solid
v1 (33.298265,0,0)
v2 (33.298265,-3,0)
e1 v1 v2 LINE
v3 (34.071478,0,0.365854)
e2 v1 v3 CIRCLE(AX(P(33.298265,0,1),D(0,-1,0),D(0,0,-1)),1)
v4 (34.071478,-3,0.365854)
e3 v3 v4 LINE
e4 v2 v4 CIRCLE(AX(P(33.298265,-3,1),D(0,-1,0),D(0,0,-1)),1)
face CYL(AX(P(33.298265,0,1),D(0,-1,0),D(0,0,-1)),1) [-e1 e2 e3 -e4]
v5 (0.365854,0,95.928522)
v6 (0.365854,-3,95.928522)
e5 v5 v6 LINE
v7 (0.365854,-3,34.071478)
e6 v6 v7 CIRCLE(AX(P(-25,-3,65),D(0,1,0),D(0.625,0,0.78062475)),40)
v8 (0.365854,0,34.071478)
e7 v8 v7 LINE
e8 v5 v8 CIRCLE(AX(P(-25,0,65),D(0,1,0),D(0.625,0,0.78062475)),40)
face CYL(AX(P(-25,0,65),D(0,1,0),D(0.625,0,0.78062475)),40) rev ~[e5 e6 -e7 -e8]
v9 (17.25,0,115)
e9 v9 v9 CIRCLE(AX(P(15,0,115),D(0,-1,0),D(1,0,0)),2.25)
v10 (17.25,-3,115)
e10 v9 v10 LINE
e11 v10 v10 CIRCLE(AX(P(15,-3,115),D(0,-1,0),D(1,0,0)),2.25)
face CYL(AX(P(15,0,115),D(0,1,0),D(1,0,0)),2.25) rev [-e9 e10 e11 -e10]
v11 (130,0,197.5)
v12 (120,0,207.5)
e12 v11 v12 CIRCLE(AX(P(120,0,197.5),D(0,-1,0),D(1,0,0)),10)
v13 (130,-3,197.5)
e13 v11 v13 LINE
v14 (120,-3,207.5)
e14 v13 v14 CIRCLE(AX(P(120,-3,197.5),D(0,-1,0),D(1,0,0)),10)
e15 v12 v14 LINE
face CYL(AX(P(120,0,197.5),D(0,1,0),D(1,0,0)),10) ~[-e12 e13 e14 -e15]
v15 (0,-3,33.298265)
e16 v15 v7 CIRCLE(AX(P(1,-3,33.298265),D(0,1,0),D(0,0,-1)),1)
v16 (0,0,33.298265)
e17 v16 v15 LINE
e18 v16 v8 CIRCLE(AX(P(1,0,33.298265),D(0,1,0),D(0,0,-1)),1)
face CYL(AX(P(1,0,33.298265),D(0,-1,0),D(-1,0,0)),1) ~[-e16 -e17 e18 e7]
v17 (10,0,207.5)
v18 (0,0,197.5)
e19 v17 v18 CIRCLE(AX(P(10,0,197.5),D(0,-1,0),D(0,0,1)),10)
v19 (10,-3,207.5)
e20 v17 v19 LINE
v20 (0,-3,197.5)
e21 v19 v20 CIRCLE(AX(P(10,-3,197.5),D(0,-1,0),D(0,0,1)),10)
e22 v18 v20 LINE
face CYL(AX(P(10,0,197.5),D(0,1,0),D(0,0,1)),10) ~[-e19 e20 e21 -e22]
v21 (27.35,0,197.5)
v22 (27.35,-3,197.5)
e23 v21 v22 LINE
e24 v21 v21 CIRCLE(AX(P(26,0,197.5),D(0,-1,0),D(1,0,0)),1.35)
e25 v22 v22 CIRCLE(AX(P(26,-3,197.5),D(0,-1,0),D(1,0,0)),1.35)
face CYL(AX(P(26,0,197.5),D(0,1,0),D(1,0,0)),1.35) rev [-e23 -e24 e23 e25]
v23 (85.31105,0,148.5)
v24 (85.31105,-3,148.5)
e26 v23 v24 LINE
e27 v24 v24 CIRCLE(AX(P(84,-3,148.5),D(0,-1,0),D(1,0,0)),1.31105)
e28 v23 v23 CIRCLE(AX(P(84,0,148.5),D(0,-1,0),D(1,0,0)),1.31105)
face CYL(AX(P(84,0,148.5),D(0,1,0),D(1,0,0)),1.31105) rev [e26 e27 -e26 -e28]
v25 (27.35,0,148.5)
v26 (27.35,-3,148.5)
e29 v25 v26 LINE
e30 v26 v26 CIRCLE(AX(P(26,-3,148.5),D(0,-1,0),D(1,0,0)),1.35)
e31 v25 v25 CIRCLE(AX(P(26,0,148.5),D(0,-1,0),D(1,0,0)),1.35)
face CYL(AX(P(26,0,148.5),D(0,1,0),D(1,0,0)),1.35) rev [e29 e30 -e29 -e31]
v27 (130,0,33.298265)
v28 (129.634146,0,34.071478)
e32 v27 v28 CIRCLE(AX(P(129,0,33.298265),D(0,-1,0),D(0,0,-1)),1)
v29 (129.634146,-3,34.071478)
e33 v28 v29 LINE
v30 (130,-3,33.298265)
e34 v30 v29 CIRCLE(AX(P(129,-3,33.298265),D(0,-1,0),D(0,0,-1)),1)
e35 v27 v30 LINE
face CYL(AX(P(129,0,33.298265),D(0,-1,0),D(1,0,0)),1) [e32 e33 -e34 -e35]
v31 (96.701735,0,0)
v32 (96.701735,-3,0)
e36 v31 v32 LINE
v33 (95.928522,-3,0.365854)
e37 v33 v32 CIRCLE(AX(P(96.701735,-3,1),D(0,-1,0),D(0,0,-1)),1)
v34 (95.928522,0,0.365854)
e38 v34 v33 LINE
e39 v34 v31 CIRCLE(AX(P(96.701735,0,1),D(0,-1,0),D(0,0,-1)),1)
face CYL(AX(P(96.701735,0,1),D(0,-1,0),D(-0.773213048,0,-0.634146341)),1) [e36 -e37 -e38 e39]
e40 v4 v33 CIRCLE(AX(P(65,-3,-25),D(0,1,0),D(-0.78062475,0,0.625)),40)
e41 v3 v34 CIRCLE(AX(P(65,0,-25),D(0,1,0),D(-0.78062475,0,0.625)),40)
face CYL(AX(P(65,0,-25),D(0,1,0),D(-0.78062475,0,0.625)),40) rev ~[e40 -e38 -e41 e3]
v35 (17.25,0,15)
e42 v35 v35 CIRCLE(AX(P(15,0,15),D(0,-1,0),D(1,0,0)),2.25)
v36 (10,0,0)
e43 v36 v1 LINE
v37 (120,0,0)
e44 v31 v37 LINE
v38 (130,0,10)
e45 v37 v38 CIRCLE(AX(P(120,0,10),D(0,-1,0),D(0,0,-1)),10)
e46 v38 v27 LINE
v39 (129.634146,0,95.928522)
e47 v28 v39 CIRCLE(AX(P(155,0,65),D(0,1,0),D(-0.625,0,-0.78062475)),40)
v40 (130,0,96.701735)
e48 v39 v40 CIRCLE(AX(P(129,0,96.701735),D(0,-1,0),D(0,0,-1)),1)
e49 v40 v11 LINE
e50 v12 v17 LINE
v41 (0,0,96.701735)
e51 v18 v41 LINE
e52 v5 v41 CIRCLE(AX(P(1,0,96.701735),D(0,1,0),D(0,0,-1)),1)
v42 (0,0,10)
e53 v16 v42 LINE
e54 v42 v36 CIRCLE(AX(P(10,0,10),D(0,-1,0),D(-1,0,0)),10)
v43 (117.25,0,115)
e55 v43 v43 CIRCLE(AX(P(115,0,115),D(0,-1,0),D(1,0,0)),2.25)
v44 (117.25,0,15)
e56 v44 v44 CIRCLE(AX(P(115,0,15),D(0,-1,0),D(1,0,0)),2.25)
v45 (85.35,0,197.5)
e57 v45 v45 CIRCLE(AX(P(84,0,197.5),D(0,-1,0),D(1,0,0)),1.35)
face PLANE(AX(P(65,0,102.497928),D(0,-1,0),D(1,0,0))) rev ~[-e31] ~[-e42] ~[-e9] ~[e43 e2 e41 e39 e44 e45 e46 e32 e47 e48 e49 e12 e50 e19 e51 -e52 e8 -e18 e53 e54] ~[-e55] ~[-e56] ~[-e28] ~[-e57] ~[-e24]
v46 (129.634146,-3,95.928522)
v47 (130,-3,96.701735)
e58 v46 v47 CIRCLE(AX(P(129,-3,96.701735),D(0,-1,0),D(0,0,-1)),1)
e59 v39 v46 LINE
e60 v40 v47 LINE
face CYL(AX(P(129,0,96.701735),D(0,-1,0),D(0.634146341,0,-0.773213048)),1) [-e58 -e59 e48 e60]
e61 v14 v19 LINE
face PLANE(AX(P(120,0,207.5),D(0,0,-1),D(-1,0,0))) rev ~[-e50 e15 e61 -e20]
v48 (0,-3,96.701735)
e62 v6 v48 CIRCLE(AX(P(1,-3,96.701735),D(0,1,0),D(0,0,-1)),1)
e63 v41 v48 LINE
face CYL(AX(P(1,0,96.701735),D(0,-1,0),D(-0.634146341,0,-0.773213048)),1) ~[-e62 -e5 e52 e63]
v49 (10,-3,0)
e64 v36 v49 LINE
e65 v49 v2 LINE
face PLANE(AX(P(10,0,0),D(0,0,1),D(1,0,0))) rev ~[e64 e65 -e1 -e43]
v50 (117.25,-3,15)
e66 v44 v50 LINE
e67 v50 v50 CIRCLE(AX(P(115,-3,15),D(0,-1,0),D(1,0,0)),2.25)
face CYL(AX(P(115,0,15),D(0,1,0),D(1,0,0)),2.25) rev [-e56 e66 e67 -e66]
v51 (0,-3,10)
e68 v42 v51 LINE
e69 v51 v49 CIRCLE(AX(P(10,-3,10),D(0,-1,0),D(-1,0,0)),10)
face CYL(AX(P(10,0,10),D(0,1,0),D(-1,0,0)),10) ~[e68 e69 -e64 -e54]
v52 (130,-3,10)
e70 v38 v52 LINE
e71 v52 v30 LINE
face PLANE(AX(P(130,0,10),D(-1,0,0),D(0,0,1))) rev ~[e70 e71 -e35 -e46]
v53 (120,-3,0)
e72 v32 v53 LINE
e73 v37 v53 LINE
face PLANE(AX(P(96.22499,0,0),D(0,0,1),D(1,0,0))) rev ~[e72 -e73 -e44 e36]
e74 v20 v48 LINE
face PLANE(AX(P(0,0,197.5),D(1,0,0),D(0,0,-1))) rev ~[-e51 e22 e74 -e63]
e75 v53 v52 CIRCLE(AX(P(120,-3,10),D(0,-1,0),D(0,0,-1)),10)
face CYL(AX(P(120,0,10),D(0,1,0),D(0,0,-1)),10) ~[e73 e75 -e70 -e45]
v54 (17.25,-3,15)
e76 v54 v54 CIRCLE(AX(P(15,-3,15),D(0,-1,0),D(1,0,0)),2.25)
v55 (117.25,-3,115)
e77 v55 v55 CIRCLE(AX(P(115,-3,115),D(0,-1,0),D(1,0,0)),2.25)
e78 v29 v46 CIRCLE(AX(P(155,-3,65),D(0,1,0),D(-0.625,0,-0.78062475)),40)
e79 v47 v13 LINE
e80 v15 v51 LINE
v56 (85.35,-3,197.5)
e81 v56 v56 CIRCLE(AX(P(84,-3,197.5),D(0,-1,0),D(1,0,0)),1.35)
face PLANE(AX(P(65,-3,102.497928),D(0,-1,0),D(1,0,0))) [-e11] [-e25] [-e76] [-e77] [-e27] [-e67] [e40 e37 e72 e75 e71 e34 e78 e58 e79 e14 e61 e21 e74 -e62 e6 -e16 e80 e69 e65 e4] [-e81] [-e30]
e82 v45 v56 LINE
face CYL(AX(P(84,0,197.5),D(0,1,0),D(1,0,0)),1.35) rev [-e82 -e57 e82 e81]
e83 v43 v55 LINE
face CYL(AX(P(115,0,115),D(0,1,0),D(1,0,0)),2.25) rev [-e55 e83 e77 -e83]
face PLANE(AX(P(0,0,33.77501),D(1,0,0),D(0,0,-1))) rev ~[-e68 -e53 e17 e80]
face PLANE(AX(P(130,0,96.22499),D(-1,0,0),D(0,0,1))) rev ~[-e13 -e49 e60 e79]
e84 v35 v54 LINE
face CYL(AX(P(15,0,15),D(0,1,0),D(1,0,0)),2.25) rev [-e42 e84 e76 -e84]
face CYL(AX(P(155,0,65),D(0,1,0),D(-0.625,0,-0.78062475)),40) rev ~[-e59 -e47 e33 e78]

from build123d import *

# Parameters (mm, degrees)
F0_R     = 2.25
F0_R_2   = 1.35
F0_R_3   = 1.3110502125
F1_DEPTH = 3
F2_R     = 1


with BuildPart() as f1:
    # F0 (on Front) → F1 (new body)
    with BuildSketch(Plane.XZ):
        with BuildLine():
            ThreePointArc((0, 10), (2.9289321881, 2.9289321881), (10, 0))
            Line((10, 0), (33.775010008, 0))
            ThreePointArc((33.775010008, 0), (65, 15), (96.224989992, 0))
            Line((96.224989992, 0), (120, 0))
            ThreePointArc((120, 0), (127.0710678119, 2.9289321881), (130, 10))
            Line((130, 10), (130, 33.775010008))
            ThreePointArc((130, 33.775010008), (115, 65), (130, 96.224989992))
            Line((130, 96.224989992), (130, 197.5))
            ThreePointArc((130, 197.5), (127.0710678119, 204.5710678119), (120, 207.5))
            Line((120, 207.5), (10, 207.5))
            ThreePointArc((10, 207.5), (2.9289321881, 204.5710678119), (0, 197.5))
            Line((0, 197.5), (0, 96.224989992))
            ThreePointArc((0, 96.224989992), (15, 65), (0, 33.775010008))
            Line((0, 33.775010008), (0, 10))
        make_face()
        with Locations((15, 15)):
            Circle(F0_R, mode=Mode.SUBTRACT)
        with Locations((115, 15)):
            Circle(F0_R, mode=Mode.SUBTRACT)
        with Locations((15, 115)):
            Circle(F0_R, mode=Mode.SUBTRACT)
        with Locations((26, 148.5)):
            Circle(F0_R_2, mode=Mode.SUBTRACT)
        with Locations((26, 197.5)):
            Circle(F0_R_2, mode=Mode.SUBTRACT)
        with Locations((84, 148.5)):
            Circle(F0_R_3, mode=Mode.SUBTRACT)
        with Locations((115, 115)):
            Circle(F0_R, mode=Mode.SUBTRACT)
        with Locations((84, 197.5)):
            Circle(F0_R_2, mode=Mode.SUBTRACT)
    extrude(amount=F1_DEPTH)

    # F2
    f2_edges = [f1.edges().sort_by_distance(p)[0] for p in [
        (0, -1.5, 33.77501),
        (130, -1.5, 96.22499),
        (33.77501, -1.5, 0),
        (96.22499, -1.5, 0),
        (130, -1.5, 33.77501),
        (0, -1.5, 96.22499),
    ]]
    fillet(f2_edges, radius=F2_R)


solid = f1.part
